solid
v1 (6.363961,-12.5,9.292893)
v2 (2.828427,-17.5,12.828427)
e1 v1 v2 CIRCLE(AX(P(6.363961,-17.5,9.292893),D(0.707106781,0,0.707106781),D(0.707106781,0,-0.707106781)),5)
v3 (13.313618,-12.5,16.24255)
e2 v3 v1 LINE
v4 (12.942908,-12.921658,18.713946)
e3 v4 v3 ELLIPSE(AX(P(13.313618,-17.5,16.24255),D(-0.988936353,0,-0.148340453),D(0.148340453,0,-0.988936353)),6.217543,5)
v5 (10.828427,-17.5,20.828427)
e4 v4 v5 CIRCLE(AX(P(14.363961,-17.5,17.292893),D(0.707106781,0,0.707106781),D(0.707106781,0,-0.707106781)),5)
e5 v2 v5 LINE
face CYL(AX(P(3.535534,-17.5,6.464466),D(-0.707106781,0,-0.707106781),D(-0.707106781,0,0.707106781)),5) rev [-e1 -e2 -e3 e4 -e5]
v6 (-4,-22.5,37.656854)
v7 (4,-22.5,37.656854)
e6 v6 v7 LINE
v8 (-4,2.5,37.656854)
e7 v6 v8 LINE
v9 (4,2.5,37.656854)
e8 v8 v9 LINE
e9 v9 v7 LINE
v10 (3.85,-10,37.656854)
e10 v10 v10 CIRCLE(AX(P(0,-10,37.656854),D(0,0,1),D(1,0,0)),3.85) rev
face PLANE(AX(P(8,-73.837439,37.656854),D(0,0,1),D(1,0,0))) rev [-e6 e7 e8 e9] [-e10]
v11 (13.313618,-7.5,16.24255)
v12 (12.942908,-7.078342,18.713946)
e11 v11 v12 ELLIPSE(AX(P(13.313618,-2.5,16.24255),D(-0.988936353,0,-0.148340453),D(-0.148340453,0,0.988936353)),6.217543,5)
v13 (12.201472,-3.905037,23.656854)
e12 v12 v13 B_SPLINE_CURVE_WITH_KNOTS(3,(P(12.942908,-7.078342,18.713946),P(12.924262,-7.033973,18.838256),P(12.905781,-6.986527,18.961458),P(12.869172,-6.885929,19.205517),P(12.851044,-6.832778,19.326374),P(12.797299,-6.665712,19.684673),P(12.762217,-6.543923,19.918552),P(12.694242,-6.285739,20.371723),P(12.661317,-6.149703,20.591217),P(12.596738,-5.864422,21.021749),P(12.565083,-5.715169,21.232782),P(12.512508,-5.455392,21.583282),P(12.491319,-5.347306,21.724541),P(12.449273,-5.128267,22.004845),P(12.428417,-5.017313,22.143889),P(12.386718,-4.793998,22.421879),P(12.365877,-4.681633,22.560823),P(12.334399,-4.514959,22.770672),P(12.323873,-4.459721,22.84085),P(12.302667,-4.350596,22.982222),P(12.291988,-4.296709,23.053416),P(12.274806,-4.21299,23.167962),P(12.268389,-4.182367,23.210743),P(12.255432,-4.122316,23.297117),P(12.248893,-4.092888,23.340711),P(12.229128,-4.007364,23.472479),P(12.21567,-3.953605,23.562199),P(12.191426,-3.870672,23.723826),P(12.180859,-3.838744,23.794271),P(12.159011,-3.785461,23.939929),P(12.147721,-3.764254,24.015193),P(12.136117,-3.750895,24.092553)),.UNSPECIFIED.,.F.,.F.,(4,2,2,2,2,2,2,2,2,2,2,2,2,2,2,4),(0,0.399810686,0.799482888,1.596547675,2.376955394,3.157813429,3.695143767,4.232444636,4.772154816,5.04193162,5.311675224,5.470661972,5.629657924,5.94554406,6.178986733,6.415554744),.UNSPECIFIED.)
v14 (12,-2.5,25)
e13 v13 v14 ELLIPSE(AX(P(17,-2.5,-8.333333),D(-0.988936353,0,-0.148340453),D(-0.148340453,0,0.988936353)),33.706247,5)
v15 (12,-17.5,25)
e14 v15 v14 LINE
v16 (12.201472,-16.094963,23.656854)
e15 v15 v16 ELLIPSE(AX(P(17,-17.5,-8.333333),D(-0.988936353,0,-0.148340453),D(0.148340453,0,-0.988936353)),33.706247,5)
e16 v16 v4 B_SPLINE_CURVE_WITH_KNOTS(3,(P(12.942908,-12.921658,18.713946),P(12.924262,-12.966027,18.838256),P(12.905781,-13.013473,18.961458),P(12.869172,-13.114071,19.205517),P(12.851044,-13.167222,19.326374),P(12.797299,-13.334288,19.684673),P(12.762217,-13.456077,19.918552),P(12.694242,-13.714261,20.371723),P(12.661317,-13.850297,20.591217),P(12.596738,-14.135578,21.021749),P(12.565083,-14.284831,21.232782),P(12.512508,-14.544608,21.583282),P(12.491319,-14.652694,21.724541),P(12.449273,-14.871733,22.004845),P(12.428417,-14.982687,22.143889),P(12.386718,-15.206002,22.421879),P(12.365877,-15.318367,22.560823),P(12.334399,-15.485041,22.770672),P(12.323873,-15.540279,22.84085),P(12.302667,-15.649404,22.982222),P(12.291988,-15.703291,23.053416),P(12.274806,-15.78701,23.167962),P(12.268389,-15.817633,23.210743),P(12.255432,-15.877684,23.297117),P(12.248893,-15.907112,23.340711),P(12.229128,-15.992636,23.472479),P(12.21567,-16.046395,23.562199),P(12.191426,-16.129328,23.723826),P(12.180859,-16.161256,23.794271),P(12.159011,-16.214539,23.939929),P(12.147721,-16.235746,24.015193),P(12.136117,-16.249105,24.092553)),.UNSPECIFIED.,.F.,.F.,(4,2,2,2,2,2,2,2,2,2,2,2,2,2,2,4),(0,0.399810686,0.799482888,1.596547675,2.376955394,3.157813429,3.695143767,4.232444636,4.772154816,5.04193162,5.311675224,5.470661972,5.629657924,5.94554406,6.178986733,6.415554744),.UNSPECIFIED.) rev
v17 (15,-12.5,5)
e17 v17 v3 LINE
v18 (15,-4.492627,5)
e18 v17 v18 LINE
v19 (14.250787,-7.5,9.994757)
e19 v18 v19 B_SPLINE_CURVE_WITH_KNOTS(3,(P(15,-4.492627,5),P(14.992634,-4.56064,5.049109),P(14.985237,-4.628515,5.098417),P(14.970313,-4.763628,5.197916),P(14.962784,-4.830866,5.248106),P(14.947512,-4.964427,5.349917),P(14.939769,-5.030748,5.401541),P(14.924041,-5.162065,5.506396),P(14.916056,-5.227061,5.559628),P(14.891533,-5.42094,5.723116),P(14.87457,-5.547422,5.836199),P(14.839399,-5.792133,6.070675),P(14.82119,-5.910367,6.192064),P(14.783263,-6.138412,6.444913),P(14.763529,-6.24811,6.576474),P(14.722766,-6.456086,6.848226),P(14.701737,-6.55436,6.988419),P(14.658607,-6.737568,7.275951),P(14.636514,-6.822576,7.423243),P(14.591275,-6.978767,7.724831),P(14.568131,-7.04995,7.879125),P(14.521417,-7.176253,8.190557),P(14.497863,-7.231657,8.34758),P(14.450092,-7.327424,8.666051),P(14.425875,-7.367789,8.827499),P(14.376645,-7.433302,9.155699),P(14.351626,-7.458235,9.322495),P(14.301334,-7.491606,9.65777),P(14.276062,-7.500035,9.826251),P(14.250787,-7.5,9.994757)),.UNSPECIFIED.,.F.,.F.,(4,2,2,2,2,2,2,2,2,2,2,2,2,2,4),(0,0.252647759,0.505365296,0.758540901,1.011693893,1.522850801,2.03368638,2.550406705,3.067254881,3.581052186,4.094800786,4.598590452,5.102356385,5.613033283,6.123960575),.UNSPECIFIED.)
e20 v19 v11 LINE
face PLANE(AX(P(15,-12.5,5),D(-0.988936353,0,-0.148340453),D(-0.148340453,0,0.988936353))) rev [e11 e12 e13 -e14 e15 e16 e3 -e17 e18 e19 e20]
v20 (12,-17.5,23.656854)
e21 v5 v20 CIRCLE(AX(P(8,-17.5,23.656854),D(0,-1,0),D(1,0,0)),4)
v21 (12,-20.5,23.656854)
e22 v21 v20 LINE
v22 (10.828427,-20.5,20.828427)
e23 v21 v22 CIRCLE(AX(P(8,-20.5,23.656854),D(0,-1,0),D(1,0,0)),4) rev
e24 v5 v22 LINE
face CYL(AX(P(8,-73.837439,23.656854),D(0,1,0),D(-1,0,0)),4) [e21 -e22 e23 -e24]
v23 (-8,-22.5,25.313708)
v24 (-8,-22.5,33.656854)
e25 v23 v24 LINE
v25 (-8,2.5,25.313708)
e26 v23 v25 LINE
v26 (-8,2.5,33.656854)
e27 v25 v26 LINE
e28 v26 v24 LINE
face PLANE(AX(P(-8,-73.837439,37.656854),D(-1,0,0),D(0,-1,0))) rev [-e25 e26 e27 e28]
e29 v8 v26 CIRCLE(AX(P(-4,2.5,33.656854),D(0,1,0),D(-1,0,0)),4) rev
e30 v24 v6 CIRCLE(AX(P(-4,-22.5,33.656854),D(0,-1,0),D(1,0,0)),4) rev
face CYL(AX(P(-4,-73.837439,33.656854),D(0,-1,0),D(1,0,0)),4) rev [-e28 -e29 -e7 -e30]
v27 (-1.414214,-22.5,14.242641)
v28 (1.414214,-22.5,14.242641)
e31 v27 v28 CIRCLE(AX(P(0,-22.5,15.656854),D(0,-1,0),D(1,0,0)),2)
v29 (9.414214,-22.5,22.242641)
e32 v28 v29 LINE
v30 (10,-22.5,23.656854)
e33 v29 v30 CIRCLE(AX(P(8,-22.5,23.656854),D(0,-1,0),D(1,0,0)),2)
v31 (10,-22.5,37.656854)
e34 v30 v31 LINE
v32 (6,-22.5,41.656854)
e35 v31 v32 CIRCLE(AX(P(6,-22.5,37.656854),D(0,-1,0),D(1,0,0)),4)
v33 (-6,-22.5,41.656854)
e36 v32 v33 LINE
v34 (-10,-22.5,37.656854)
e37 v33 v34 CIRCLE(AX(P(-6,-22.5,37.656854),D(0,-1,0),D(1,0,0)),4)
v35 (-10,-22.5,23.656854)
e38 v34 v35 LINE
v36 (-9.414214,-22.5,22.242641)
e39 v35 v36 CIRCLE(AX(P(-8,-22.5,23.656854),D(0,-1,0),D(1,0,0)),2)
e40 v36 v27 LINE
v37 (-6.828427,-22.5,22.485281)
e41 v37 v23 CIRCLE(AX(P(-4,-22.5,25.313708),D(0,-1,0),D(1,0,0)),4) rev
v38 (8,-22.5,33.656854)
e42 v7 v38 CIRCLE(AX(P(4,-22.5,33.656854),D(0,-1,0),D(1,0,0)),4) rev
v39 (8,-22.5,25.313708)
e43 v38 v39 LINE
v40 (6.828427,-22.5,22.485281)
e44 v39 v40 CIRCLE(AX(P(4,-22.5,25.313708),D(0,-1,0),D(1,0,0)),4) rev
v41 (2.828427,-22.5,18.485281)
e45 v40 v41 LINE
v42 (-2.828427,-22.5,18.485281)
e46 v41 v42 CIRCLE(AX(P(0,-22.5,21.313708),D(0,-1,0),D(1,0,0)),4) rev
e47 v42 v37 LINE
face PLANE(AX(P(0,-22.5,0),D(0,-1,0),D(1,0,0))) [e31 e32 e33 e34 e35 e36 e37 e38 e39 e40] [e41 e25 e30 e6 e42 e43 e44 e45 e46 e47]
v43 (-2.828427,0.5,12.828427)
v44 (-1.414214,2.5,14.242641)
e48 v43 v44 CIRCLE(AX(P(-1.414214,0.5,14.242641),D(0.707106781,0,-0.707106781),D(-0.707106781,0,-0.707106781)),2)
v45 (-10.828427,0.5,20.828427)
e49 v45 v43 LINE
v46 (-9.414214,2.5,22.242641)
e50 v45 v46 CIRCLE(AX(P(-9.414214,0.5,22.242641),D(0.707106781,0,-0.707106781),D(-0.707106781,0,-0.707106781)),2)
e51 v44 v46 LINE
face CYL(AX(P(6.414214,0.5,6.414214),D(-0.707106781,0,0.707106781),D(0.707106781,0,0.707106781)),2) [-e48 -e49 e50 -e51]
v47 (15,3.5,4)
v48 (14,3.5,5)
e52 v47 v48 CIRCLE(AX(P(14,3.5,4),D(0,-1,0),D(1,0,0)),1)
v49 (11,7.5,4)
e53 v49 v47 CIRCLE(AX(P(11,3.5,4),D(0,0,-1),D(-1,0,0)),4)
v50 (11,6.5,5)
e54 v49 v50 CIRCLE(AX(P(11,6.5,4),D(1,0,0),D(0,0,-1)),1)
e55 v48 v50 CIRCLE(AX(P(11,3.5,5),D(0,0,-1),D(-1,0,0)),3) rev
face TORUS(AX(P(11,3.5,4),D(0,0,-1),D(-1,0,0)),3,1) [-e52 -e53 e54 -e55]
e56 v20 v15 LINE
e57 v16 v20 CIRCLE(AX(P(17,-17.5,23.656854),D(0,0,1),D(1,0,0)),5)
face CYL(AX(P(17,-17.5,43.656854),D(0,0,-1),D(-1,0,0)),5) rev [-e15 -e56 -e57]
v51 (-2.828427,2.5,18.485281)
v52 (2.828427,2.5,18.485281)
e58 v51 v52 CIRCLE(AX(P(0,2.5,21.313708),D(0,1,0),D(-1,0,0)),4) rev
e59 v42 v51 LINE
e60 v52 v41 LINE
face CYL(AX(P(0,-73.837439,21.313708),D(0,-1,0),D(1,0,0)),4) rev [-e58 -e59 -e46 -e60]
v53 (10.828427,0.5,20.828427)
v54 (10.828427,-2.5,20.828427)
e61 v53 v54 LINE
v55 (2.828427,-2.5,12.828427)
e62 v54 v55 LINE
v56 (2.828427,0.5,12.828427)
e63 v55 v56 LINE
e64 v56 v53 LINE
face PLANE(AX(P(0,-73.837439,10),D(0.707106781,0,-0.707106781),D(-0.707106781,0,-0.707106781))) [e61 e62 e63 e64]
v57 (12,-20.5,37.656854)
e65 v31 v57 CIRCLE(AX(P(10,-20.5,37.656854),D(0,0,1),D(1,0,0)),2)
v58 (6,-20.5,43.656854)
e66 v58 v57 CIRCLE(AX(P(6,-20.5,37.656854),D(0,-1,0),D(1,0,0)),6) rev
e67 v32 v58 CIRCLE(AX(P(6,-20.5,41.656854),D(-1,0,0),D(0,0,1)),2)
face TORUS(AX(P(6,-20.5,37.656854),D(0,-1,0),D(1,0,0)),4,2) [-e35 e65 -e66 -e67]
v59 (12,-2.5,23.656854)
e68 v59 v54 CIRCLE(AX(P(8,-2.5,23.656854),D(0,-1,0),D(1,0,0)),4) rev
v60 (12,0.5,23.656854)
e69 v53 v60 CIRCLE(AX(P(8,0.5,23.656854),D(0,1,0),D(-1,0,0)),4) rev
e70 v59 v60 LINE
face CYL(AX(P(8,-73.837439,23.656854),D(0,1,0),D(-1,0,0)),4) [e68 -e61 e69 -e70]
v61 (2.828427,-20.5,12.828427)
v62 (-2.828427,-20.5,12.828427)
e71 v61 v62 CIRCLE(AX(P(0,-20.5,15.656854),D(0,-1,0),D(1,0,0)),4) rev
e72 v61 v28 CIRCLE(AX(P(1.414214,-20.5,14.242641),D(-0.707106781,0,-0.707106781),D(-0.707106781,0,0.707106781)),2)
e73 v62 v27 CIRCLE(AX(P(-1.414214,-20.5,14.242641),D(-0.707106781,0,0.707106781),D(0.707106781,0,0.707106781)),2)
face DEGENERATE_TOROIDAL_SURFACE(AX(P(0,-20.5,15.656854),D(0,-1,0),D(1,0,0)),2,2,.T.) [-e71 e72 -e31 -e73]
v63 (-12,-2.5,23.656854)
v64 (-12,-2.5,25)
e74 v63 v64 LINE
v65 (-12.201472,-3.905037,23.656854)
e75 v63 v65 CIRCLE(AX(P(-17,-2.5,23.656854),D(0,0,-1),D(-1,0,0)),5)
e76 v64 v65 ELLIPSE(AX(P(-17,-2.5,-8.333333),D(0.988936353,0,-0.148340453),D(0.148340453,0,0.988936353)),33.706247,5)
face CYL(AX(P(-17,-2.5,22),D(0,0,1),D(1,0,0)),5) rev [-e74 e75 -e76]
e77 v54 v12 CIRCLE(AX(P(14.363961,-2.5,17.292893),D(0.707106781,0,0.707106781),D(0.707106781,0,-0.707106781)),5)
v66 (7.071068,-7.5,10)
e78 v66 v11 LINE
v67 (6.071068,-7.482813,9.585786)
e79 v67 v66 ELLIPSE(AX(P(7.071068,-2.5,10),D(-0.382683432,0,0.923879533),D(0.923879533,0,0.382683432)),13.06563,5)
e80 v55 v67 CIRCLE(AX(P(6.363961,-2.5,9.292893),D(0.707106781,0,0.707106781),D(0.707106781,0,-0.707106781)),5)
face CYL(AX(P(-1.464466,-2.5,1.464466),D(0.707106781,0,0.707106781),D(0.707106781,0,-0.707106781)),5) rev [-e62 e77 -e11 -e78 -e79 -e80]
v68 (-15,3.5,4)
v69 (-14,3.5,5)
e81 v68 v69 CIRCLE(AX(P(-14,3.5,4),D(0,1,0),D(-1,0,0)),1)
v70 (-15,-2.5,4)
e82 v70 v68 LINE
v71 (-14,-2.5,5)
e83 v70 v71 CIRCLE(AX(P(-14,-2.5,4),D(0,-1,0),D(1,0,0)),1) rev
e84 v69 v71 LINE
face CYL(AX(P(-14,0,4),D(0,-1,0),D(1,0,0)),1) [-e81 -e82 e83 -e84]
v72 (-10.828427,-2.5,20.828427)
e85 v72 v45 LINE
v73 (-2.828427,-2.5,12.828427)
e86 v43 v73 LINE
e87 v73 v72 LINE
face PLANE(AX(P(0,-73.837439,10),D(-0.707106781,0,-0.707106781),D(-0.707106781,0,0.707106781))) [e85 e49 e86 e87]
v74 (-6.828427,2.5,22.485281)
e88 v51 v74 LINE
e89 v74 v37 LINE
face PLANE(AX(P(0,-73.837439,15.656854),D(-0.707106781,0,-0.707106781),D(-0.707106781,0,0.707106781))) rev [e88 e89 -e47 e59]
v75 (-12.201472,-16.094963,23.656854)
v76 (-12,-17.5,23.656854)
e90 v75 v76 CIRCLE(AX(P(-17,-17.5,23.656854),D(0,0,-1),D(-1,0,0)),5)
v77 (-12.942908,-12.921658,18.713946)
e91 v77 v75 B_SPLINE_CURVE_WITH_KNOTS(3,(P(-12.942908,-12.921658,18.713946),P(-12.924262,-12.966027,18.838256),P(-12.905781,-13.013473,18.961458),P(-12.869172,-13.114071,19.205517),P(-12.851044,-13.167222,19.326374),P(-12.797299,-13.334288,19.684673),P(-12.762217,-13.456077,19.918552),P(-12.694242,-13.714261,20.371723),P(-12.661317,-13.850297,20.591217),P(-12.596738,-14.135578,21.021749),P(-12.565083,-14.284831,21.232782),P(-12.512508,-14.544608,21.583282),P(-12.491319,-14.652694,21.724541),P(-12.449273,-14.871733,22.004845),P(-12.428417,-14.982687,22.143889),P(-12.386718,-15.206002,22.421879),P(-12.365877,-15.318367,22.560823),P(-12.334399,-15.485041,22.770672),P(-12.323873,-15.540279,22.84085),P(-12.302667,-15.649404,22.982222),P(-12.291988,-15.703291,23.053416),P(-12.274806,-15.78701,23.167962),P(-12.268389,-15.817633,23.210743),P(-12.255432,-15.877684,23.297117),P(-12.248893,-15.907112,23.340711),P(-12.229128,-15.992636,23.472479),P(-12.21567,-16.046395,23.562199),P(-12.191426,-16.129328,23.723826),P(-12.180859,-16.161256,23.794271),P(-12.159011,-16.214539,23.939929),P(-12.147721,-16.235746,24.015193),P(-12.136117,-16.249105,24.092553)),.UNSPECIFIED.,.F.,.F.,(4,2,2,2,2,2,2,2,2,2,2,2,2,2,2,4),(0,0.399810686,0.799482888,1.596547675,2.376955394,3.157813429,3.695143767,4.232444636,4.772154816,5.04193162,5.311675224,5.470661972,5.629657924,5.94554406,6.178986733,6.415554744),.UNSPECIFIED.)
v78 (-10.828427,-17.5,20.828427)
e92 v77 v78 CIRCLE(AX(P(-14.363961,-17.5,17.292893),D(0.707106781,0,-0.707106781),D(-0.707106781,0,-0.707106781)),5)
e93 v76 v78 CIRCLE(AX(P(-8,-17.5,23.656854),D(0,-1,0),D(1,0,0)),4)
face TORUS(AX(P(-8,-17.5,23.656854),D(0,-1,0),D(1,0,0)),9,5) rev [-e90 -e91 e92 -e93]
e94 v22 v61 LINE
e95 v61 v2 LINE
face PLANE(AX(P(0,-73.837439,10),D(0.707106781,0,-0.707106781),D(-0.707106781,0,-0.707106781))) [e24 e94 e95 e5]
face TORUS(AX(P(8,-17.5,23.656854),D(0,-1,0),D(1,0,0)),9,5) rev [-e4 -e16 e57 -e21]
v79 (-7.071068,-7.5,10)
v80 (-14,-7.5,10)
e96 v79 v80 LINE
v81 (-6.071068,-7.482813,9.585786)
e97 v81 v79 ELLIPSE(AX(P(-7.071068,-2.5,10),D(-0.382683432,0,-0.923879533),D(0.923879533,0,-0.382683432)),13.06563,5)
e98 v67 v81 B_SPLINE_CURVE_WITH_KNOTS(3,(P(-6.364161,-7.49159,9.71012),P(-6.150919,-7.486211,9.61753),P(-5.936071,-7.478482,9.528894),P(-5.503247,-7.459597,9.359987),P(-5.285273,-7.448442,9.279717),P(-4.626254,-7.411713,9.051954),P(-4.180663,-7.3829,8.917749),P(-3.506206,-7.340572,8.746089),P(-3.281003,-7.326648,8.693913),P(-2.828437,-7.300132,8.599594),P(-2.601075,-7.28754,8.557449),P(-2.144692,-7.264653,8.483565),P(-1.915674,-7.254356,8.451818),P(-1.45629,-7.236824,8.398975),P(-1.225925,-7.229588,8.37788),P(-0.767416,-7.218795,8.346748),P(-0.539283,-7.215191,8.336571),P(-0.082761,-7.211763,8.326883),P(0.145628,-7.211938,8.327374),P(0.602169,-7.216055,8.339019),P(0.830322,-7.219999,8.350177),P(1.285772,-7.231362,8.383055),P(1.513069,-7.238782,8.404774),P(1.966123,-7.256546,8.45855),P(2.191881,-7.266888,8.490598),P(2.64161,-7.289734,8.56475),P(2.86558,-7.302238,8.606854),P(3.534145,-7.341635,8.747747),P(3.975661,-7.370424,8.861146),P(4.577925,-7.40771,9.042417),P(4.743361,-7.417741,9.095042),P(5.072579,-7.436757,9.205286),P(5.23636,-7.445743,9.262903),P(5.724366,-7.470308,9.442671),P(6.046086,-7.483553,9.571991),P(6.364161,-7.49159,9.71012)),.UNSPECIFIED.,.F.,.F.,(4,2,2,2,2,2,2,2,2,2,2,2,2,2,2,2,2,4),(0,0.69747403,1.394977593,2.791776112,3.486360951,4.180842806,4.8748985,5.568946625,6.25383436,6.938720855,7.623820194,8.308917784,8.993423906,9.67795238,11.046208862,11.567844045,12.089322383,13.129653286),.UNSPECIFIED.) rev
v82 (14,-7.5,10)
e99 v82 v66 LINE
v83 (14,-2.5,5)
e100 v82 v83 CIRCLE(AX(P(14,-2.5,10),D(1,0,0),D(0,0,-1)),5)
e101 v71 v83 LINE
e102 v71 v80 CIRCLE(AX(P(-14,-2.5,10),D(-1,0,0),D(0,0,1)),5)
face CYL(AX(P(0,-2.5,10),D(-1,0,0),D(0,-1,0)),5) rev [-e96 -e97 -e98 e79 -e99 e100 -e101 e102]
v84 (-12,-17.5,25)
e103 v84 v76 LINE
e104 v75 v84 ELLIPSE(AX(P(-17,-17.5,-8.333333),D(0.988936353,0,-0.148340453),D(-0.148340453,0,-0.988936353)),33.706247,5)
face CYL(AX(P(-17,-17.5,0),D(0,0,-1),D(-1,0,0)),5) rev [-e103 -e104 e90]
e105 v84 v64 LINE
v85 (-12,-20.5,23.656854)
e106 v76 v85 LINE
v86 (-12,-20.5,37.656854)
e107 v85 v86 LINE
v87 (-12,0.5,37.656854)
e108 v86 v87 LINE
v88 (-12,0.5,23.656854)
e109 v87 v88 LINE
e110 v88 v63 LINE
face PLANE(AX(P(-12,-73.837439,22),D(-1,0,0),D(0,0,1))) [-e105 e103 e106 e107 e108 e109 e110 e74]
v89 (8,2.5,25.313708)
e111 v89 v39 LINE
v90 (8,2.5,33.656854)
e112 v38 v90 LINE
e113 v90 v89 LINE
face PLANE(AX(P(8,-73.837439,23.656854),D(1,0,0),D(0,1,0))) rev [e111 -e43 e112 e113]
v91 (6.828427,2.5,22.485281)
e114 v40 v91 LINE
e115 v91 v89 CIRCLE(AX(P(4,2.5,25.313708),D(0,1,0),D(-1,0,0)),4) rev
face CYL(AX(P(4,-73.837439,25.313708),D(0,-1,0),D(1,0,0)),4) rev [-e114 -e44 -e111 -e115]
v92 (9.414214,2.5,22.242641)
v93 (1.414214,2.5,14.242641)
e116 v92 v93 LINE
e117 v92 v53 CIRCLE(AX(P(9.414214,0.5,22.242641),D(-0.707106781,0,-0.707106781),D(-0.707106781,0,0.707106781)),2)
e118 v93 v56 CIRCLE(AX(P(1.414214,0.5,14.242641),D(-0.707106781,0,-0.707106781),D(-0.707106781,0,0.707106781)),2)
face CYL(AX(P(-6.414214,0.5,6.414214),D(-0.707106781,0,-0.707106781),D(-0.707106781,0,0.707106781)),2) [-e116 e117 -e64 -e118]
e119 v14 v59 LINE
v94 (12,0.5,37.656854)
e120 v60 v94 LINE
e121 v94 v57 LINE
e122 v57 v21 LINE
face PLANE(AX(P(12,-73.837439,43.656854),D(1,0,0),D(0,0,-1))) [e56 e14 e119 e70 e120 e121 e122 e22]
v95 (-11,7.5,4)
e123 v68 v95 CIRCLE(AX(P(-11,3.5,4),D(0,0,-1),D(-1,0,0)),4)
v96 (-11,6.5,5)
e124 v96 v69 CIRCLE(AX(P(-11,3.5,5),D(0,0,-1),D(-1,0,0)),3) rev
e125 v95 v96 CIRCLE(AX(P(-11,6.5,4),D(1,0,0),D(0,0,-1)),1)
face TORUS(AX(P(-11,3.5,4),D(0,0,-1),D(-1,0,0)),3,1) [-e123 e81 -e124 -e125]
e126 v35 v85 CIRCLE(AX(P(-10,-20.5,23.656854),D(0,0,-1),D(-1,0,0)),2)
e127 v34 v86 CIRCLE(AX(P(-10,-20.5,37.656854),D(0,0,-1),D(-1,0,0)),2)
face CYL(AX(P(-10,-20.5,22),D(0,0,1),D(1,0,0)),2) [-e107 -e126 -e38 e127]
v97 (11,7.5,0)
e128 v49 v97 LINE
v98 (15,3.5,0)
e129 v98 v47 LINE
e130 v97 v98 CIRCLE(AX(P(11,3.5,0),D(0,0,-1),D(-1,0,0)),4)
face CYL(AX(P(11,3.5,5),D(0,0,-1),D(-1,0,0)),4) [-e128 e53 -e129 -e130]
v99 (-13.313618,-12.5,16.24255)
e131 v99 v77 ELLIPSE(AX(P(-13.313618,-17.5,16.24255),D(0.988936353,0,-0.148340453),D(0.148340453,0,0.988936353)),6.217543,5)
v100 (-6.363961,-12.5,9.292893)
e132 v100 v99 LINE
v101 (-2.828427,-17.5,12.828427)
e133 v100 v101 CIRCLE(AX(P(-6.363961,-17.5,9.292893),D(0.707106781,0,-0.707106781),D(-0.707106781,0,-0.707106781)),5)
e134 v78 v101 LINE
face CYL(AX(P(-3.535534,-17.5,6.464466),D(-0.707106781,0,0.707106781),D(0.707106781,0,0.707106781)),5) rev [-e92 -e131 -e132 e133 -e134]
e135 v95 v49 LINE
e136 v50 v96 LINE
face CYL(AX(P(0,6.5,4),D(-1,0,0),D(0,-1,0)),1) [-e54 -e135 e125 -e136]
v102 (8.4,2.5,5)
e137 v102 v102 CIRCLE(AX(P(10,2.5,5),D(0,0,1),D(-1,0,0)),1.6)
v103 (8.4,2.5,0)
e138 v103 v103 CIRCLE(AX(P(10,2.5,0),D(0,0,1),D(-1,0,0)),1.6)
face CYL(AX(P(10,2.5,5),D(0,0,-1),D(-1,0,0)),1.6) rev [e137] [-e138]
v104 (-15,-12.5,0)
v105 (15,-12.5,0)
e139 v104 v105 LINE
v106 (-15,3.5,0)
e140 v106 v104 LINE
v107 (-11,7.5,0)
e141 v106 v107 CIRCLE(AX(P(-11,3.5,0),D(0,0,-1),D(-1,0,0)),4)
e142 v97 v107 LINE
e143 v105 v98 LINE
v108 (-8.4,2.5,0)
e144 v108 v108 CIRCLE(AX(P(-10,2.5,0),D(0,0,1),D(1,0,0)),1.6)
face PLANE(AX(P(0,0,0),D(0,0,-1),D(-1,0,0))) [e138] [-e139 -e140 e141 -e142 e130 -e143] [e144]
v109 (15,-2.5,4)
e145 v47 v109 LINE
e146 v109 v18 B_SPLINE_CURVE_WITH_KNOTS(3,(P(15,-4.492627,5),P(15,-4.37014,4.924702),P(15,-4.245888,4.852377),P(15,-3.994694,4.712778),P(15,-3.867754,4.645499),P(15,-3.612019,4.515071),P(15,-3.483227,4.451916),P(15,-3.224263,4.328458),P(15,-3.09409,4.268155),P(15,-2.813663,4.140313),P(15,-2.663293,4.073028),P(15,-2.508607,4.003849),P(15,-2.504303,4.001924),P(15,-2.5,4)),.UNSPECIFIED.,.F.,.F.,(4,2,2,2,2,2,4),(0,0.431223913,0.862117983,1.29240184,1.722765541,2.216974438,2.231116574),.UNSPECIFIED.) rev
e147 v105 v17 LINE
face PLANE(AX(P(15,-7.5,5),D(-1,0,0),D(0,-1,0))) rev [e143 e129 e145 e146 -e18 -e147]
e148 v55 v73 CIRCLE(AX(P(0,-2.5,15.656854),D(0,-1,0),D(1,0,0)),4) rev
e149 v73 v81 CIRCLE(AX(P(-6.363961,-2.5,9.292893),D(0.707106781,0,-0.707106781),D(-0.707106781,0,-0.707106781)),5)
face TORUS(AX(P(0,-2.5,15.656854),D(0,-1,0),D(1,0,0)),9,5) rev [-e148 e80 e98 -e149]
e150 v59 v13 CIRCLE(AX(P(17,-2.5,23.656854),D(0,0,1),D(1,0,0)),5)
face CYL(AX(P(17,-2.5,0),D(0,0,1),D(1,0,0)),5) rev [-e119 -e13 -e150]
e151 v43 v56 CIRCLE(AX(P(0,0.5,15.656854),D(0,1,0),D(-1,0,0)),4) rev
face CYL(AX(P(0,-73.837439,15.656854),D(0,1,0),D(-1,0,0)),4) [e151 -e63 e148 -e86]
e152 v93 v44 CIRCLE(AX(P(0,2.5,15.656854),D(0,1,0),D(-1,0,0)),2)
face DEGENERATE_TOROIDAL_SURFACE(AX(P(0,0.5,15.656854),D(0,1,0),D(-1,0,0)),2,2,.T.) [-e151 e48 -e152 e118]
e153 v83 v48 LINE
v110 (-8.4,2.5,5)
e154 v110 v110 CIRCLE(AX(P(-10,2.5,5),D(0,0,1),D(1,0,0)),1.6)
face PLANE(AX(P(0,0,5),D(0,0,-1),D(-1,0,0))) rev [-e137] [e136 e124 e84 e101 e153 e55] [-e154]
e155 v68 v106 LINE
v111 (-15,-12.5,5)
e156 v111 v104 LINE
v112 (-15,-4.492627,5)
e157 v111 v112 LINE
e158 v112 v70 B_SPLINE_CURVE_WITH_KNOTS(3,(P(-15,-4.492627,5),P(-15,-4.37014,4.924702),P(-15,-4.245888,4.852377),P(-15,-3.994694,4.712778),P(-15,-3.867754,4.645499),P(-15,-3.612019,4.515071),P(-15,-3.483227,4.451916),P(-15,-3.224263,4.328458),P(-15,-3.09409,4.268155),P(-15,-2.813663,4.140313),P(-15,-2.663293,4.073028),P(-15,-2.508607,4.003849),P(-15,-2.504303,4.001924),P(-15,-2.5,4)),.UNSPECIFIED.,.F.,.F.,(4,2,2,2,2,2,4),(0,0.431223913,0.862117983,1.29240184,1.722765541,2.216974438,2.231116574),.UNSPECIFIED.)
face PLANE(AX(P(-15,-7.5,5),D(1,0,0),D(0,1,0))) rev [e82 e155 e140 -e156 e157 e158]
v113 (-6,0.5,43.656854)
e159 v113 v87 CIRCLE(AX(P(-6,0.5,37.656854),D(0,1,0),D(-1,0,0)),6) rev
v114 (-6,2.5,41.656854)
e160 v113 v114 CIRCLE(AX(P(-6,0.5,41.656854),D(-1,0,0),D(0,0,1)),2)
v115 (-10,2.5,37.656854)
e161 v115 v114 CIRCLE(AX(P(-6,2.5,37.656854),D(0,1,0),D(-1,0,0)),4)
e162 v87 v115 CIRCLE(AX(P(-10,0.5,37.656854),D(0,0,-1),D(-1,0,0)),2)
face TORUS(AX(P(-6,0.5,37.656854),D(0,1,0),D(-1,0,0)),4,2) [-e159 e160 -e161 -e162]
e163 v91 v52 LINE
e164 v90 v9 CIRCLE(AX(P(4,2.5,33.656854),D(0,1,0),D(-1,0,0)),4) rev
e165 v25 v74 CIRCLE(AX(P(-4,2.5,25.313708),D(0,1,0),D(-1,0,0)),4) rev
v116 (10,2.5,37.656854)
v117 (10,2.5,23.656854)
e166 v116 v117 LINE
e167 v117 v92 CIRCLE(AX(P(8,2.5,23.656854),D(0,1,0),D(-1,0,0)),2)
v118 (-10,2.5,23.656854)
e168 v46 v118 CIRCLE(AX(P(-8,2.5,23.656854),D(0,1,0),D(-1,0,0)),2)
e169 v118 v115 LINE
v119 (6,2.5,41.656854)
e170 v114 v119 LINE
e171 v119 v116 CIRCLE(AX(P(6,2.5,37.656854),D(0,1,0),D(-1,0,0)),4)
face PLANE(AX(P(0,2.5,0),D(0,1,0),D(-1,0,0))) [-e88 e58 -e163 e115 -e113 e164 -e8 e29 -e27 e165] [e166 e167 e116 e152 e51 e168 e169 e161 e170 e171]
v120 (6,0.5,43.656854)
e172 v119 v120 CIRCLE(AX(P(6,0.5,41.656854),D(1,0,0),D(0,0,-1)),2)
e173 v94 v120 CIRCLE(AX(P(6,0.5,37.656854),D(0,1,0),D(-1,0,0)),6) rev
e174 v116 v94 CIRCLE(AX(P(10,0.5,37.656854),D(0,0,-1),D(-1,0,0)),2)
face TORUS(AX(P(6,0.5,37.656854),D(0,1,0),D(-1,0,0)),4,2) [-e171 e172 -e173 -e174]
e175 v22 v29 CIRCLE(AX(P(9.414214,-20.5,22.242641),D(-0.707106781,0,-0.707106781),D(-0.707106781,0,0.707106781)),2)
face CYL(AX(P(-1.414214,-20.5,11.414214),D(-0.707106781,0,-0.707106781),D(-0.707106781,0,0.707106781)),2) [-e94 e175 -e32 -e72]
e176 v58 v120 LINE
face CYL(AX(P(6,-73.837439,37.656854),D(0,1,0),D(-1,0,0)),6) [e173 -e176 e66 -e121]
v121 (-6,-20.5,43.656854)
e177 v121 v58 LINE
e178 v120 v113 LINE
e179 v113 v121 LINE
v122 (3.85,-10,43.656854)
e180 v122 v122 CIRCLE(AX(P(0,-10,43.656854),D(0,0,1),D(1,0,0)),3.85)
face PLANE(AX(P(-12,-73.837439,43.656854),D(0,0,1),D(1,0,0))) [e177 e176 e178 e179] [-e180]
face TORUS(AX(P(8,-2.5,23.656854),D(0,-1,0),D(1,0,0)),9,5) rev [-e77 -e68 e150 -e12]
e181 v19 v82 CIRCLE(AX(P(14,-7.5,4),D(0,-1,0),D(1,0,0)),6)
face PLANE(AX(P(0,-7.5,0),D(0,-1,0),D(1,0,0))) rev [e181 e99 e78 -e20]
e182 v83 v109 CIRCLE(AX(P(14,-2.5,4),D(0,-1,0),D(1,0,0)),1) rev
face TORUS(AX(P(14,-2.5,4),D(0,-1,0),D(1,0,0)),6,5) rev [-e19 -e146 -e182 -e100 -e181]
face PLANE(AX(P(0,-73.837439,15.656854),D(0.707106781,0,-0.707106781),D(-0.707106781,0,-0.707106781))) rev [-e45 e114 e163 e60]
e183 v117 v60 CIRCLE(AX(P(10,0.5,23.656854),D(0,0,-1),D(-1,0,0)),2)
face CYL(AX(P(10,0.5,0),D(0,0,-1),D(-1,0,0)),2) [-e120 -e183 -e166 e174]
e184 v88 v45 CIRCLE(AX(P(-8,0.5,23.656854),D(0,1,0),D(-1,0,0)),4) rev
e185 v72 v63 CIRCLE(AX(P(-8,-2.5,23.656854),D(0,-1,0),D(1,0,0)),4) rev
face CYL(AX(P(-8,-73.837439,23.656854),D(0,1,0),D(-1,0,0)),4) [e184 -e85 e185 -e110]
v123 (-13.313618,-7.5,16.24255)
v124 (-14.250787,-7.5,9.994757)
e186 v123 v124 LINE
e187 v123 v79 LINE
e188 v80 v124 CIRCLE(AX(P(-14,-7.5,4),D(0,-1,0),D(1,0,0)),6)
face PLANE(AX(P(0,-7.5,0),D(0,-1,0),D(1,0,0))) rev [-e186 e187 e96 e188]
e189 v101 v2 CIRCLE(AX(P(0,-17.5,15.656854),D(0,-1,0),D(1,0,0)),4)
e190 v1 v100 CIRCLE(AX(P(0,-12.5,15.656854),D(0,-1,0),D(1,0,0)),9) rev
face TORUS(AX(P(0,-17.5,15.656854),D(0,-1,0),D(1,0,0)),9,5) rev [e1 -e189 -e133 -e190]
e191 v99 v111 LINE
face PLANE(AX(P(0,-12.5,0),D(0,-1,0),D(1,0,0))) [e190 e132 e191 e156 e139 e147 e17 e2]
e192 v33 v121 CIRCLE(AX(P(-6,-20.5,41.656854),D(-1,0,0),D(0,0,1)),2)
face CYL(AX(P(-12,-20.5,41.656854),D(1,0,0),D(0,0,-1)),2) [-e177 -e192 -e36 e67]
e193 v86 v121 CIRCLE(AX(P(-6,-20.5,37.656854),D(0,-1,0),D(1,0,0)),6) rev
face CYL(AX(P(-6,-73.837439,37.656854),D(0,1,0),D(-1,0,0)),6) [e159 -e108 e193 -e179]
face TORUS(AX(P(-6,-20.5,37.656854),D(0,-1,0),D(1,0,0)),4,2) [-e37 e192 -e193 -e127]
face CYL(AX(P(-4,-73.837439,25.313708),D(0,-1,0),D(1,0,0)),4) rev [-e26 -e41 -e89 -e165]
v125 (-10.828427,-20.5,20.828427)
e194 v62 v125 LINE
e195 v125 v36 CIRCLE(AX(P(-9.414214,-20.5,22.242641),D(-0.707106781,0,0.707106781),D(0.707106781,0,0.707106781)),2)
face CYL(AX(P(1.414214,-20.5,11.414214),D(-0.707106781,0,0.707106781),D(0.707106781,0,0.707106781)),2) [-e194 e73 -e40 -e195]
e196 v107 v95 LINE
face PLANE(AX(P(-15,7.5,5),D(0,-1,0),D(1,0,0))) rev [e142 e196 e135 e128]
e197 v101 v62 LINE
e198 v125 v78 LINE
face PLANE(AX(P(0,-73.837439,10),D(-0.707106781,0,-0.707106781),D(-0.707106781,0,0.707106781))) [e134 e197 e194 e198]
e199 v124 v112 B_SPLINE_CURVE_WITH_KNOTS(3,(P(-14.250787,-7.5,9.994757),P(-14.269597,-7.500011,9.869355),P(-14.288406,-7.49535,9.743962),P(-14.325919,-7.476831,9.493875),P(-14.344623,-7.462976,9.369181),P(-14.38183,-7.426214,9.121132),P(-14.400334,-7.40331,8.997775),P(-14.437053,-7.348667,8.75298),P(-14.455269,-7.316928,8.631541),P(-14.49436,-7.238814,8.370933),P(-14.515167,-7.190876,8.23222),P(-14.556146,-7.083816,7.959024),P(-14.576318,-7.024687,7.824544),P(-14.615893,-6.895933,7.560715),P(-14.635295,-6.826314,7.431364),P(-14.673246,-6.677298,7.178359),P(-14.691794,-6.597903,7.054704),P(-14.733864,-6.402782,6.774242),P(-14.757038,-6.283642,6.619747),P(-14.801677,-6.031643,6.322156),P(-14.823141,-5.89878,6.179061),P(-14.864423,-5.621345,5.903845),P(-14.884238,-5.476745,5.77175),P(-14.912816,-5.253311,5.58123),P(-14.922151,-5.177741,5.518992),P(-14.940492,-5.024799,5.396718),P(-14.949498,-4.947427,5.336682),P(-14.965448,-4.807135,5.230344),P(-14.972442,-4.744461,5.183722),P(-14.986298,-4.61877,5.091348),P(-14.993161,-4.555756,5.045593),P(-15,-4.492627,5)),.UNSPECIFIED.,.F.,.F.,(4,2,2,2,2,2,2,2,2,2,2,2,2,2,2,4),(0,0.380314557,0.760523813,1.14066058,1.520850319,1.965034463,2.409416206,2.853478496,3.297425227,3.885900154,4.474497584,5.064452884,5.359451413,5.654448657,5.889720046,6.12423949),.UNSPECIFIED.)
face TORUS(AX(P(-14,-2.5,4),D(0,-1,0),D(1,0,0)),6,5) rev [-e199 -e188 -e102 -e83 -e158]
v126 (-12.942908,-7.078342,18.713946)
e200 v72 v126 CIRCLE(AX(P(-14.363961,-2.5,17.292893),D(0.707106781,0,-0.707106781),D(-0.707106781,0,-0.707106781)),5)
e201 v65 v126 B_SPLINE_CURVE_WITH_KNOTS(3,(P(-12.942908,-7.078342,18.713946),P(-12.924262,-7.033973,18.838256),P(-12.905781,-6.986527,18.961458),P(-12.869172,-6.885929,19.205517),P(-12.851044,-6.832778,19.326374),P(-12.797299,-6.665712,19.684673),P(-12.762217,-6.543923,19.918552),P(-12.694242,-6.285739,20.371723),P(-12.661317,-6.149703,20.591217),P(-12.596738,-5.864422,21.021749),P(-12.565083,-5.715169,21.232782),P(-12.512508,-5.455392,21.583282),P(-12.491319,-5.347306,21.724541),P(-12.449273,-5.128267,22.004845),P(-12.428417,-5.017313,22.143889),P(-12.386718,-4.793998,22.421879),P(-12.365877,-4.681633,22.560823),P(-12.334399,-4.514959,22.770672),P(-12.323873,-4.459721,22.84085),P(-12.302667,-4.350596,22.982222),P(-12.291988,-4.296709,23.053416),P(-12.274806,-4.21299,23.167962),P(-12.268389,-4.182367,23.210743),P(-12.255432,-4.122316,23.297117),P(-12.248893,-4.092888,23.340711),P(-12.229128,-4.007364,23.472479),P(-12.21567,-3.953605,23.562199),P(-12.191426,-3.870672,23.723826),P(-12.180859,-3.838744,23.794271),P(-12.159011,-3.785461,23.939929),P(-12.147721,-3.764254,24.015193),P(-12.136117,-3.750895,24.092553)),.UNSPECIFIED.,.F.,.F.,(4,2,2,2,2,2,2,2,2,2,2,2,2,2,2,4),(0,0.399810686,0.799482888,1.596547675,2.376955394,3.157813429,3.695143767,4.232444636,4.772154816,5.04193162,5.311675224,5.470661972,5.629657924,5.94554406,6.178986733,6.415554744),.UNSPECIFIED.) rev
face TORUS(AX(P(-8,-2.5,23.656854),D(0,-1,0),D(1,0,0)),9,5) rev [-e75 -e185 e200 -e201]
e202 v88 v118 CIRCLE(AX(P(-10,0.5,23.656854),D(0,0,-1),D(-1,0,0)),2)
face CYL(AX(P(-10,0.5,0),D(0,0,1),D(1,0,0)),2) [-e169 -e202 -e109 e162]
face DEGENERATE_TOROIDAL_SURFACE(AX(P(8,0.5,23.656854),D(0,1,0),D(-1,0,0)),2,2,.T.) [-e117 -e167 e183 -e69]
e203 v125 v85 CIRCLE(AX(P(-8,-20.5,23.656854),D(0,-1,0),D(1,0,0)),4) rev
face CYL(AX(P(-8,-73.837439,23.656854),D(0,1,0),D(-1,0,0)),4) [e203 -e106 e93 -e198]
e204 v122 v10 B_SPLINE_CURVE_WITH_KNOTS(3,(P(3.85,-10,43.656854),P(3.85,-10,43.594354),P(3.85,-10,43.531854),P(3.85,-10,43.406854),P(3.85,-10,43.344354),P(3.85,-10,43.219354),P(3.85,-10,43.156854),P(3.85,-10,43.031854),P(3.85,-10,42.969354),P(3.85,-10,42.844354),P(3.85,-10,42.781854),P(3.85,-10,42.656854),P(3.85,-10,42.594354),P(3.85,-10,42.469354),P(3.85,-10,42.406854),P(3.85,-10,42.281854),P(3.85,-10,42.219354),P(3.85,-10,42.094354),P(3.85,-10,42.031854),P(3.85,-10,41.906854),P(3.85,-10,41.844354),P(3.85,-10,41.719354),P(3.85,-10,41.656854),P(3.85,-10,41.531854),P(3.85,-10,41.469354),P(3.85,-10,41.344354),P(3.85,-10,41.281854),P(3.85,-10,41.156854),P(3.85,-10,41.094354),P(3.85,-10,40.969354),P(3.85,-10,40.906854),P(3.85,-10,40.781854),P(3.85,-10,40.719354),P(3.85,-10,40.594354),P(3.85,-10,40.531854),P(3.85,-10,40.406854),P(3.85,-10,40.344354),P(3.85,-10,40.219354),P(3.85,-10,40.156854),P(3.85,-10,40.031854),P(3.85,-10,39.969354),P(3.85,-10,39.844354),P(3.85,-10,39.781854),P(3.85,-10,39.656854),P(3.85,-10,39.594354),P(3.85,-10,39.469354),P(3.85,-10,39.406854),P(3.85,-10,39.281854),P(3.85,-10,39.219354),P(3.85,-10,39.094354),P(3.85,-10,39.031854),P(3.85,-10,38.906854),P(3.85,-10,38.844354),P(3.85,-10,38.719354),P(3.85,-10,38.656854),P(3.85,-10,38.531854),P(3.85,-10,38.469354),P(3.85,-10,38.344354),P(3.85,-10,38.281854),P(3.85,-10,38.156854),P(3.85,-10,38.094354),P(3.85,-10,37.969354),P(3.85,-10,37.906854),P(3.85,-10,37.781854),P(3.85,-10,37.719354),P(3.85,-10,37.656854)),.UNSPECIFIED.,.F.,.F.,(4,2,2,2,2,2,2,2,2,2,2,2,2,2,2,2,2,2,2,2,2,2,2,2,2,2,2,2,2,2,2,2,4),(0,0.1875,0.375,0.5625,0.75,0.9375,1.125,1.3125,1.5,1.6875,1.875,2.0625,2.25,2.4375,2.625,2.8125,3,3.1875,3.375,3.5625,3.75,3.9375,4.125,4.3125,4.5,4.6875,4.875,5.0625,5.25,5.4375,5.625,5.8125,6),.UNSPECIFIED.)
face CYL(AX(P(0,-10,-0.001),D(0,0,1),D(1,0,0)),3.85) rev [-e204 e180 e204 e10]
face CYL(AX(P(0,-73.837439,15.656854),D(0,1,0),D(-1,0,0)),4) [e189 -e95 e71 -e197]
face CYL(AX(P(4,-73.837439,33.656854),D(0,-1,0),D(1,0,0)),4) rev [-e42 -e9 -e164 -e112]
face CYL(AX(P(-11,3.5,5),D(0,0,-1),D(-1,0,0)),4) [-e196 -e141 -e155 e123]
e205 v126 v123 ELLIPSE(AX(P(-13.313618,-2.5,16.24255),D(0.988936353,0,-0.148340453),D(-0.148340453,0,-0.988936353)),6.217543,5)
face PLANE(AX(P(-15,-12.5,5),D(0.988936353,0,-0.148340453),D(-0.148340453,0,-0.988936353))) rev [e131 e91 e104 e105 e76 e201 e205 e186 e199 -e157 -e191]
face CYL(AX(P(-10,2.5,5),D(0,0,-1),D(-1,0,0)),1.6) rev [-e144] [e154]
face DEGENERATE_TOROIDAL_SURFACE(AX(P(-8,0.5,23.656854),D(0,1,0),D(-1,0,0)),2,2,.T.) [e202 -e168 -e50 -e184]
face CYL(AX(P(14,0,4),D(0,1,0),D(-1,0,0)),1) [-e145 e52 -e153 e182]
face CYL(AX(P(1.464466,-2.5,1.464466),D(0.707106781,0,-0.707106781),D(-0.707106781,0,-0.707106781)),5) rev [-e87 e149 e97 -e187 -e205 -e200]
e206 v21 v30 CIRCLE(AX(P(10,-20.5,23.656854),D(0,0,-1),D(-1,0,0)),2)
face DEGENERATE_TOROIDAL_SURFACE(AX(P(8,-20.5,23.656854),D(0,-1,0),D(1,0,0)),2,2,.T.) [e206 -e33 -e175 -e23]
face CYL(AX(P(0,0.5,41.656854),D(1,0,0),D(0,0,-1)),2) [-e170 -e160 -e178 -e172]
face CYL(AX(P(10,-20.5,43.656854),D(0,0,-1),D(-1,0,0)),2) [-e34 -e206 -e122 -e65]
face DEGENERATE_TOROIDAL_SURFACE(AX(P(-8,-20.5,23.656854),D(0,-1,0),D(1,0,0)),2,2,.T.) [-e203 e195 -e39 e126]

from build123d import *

# Parameters (mm, degrees)
SKETCH_1_W               = 30
SKETCH_1_H               = 15
SKETCH_1_R               = 1.6
EXTRUDE_1_DEPTH          = 5
EXTRUDE_2_DEPTH          = 5
EXTRUDE_START            = -15
EXTRUDE_3_DEPTH          = 25
CUT_EXTRUDE_1_REACH      = 53.353
SKETCH_5_R               = 3.85
CUT_EXTRUDE_3_DEPTH      = 53.496865839
CUT_EXTRUDE_3_DEPTH_BACK = 53.496865839
FILLET_1_R               = 4
FILLET_2_R               = 6
FILLET_3_R               = 2
FILLET_4_R               = 4
FILLET_9_R               = 1
FILLET_10_R              = 5


with BuildPart() as part:
    # 草图1 → 凸台-拉伸1 (new body)
    with BuildSketch(Plane.XY):
        Rectangle(SKETCH_1_W, SKETCH_1_H)
        with Locations((-10, 2.5)):
            Circle(SKETCH_1_R, mode=Mode.SUBTRACT)
        with Locations(Location((10, 2.5, 0), (0, 0, 180))):
            Circle(SKETCH_1_R, mode=Mode.SUBTRACT)
    extrude(amount=EXTRUDE_1_DEPTH)

    # 草图3 → 凸台-拉伸2 (add)
    with BuildSketch(Plane.XZ.offset(7.5)):
        Polygon((-15, 0), (15, 0), (15, 5), (12, 25), (-12, 25), (-15, 5), align=None)
    extrude(amount=EXTRUDE_2_DEPTH)

    # 草图4 → 凸台-拉伸3 (add)
    with BuildSketch(Plane(origin=(0, -7.5, 0), x_dir=(1, 0, 0), z_dir=(0, 1, 0)).offset(EXTRUDE_START)):
        Polygon((0, -10), (12, -22), (12, -43.656854249), (-12, -43.656854249), (-12, -22), align=None)
        Polygon((8, -37.656854249), (-8, -37.656854249), (-8, -23.656854249), (0, -15.656854249), (8, -23.656854249), align=None, mode=Mode.SUBTRACT)
    extrude(amount=EXTRUDE_3_DEPTH)

    # 草图5 → 切除-拉伸1 (cut, up to next)
    with BuildSketch(Plane.XY.offset(43.656854249), mode=Mode.PRIVATE) as cut_extrude_1_sk1:
        with Locations((0, -10)):
            Circle(SKETCH_5_R)
    cut_extrude_1_tool1 = extrude(cut_extrude_1_sk1.sketch, amount=-CUT_EXTRUDE_1_REACH, mode=Mode.PRIVATE) & part.part
    add(cut_extrude_1_tool1.solids().sort_by_distance((0, -10, 43.656854))[0], mode=Mode.SUBTRACT)

    # 草图7 → 切除-拉伸3 (cut, two sides: drawn at the far end of the back side and taken through both)
    with BuildSketch(Plane(origin=(0, 2.5, 0), x_dir=(1, 0, 0), z_dir=(0, 1, 0)).offset(-CUT_EXTRUDE_3_DEPTH_BACK)):
        Polygon((-8, -23.656854249), (-8, -25), (8, -25), (8, -23.656854249), (0, -15.656854249), align=None)
    extrude(amount=CUT_EXTRUDE_3_DEPTH + CUT_EXTRUDE_3_DEPTH_BACK, mode=Mode.SUBTRACT)

    # 圆角1
    fillet_1_edges = [part.edges().sort_by_distance(p)[0] for p in [
        (-12, -2.5, 22),
        (0, -2.5, 10),
        (0, -10, 15.656854249),
        (8, -10, 23.656854249),
        (-12, -17.5, 22),
        (0, -17.5, 10),
        (12, -17.5, 22),
        (12, -2.5, 22),
        (8, -10, 37.656854249),
        (-8, -10, 37.656854249),
        (-8, -10, 23.656854249),
    ]]
    fillet(fillet_1_edges, radius=FILLET_1_R)

    # 圆角2
    fillet_2_edges = [part.edges().sort_by_distance(p)[0] for p in [
        (12, -10, 43.656854249),
        (-12, -10, 43.656854249),
    ]]
    fillet(fillet_2_edges, radius=FILLET_2_R)

    # 圆角3
    fillet_3_edges = [part.edges().sort_by_distance(p)[0] for p in [
        (-6.828427125, -22.5, 16.828427125),
        (-12, -22.5, 30.656854249),
        (-12, 2.5, 30.656854249),
        (6.828427125, -22.5, 16.828427125),
        (0, -22.5, 11.656854249),
        (11.69551813, -22.5, 22.12612052),
        (-11.69551813, -22.5, 22.12612052),
        (-6.828427125, 2.5, 16.828427125),
        (6.828427125, 2.5, 16.828427125),
        (0, 2.5, 11.656854249),
        (11.69551813, 2.5, 22.12612052),
        (-11.69551813, 2.5, 22.12612052),
        (0, -22.5, 43.656854249),
        (0, 2.5, 43.656854249),
        (12, 2.5, 30.656854249),
        (-10.242640687, 2.5, 41.899494937),
        (10.242640687, 2.5, 41.899494937),
        (12, -22.5, 30.656854249),
        (-10.242640687, -22.5, 41.899494937),
        (10.242640687, -22.5, 41.899494937),
    ]]
    fillet(fillet_3_edges, radius=FILLET_3_R)

    # 圆角4
    fillet_4_edges = [part.edges().sort_by_distance(p)[0] for p in [
        (-15, 7.5, 2.5),
        (15, 7.5, 2.5),
    ]]
    fillet(fillet_4_edges, radius=FILLET_4_R)

    # 圆角9
    fillet_9_edges = [part.edges().sort_by_distance(p)[0] for p in [
        (0, 7.5, 5),
        (-15, -2, 5),
        (-13.828427125, 6.328427125, 5),
        (13.828427125, 6.328427125, 5),
        (15, -2, 5),
    ]]
    fillet(fillet_9_edges, radius=FILLET_9_R)

    # 圆角10
    # the kernel refuses this fillet: 5 mm, written as the material it adds along each edge
    with BuildSketch(Plane(origin=(-12, -7.5, 37.5), x_dir=(-1, 0, 0), z_dir=(0, 0, -1))) as fillet_10_piece_1_section:
        with BuildLine():
            CenterArc((FILLET_10_R, FILLET_10_R), FILLET_10_R, 180, 90)
            Line((0, FILLET_10_R), (0, 0))
            Line((0, 0), (FILLET_10_R, 0))
        make_face()
    fillet_10_piece_1 = extrude(amount=13.843145751, mode=Mode.PRIVATE)
    fillet_10_piece_1 = split(fillet_10_piece_1, bisect_by=Plane(origin=(-12.131106439, -5.365485475, 24.125957074), z_dir=(0.9889363528682976, 0, -0.14834045293024392)), keep=Keep.TOP, mode=Mode.PRIVATE)
    add(fillet_10_piece_1)
    with BuildSketch(Plane(origin=(12, -7.5, 23.656854249), x_dir=(1, 0, 0), z_dir=(0, 0, 1))) as fillet_10_piece_2_section:
        with BuildLine():
            CenterArc((FILLET_10_R, FILLET_10_R), FILLET_10_R, 180, 90)
            Line((0, FILLET_10_R), (0, 0))
            Line((0, 0), (FILLET_10_R, 0))
        make_face()
    fillet_10_piece_2 = extrude(amount=13.843145751, mode=Mode.PRIVATE)
    fillet_10_piece_2 = split(fillet_10_piece_2, bisect_by=Plane(origin=(12.131106439, -5.365485475, 24.125957074), z_dir=(-0.9889363528682976, 0, -0.14834045293024423)), keep=Keep.TOP, mode=Mode.PRIVATE)
    add(fillet_10_piece_2)
    with BuildSketch(Plane(origin=(2.828427125, -7.5, 12.828427125), x_dir=(0.7071067811865546, 0, -0.7071067811865405), z_dir=(0.7071067811865405, 0, 0.7071067811865547))) as fillet_10_piece_3_section:
        with BuildLine():
            CenterArc((FILLET_10_R, FILLET_10_R), FILLET_10_R, 180, 90)
            Line((0, FILLET_10_R), (0, 0))
            Line((0, 0), (FILLET_10_R, 0))
        make_face()
    fillet_10_piece_3 = extrude(amount=11.313708499, mode=Mode.PRIVATE)
    fillet_10_piece_3 = split(fillet_10_piece_3, bisect_by=Plane(origin=(13.218453032, -6.381417365, 16.876979785), z_dir=(-0.9889363528682976, 0, -0.14834045293024423)), keep=Keep.TOP, mode=Mode.PRIVATE)
    add(fillet_10_piece_3)
    with BuildSketch(Plane(origin=(0, -7.5, 15.656854249), x_dir=(0.7071067811865549, 0, -0.7071067811865404), z_dir=(0.7071067811865404, 0, 0.7071067811865549))) as fillet_10_piece_4:
        with BuildLine():
            CenterArc((4 + FILLET_10_R, FILLET_10_R), FILLET_10_R, 180, 90)
            Line((4, FILLET_10_R), (4, 0))
            Line((4, 0), (4 + FILLET_10_R, 0))
        make_face()
    revolve(axis=Axis((0, -7.5, 15.656854249), (0, 1, 0)), revolution_arc=90)
    with BuildSketch(Plane(origin=(-12, -12.5, 37.5), x_dir=(-1, 0, 0), z_dir=(0, 0, -1))) as fillet_10_piece_5_section:
        with BuildLine():
            CenterArc((FILLET_10_R, -FILLET_10_R), FILLET_10_R, 90, 90)
            Line((0, -FILLET_10_R), (0, 0))
            Line((0, 0), (FILLET_10_R, 0))
        make_face()
    fillet_10_piece_5 = extrude(amount=13.843145751, mode=Mode.PRIVATE)
    fillet_10_piece_5 = split(fillet_10_piece_5, bisect_by=Plane(origin=(-12.131106439, -14.634514525, 24.125957074), z_dir=(0.9889363528682976, 0, -0.14834045293024392)), keep=Keep.TOP, mode=Mode.PRIVATE)
    add(fillet_10_piece_5)
    with BuildSketch(Plane(origin=(12, -12.5, 23.656854249), x_dir=(1, 0, 0), z_dir=(0, 0, 1))) as fillet_10_piece_6_section:
        with BuildLine():
            CenterArc((FILLET_10_R, -FILLET_10_R), FILLET_10_R, 90, 90)
            Line((0, -FILLET_10_R), (0, 0))
            Line((0, 0), (FILLET_10_R, 0))
        make_face()
    fillet_10_piece_6 = extrude(amount=13.843145751, mode=Mode.PRIVATE)
    fillet_10_piece_6 = split(fillet_10_piece_6, bisect_by=Plane(origin=(12.131106439, -14.634514525, 24.125957074), z_dir=(-0.9889363528682976, 0, -0.14834045293024423)), keep=Keep.TOP, mode=Mode.PRIVATE)
    add(fillet_10_piece_6)
    with BuildSketch(Plane(origin=(2.828427125, -12.5, 12.828427125), x_dir=(0.7071067811865546, 0, -0.7071067811865404), z_dir=(0.7071067811865405, 0, 0.7071067811865547))) as fillet_10_piece_7_section:
        with BuildLine():
            CenterArc((FILLET_10_R, -FILLET_10_R), FILLET_10_R, 90, 90)
            Line((0, -FILLET_10_R), (0, 0))
            Line((0, 0), (FILLET_10_R, 0))
        make_face()
    fillet_10_piece_7 = extrude(amount=11.313708499, mode=Mode.PRIVATE)
    fillet_10_piece_7 = split(fillet_10_piece_7, bisect_by=Plane(origin=(13.218453032, -13.618582635, 16.876979785), z_dir=(-0.9889363528682976, 0, -0.14834045293024423)), keep=Keep.TOP, mode=Mode.PRIVATE)
    add(fillet_10_piece_7)
    with BuildSketch(Plane(origin=(0, -12.5, 15.656854249), x_dir=(0.7071067811865549, 0, -0.7071067811865404), z_dir=(0.7071067811865404, 0, 0.7071067811865549))) as fillet_10_piece_8:
        with BuildLine():
            CenterArc((4 + FILLET_10_R, -FILLET_10_R), FILLET_10_R, 90, 90)
            Line((4, -FILLET_10_R), (4, 0))
            Line((4, 0), (4 + FILLET_10_R, 0))
        make_face()
    revolve(axis=Axis((0, -12.5, 15.656854249), (0, 1, 0)), revolution_arc=90)
    with BuildSketch(Plane(origin=(-14, -7.5, 4), x_dir=(0, 0, 1), z_dir=(1, 0, 0))) as fillet_10_piece_9_section:
        with BuildLine():
            CenterArc((1 + FILLET_10_R, -FILLET_10_R), FILLET_10_R, 90, 90)
            Line((1 + FILLET_10_R, 0), (1, 0))
            Line((1, 0), (1, -FILLET_10_R))
        make_face()
    fillet_10_piece_9 = revolve(axis=Axis((-14, -7.5, 4), (0, -1, 0)), revolution_arc=359.64, mode=Mode.PRIVATE)
    fillet_10_piece_9 = split(fillet_10_piece_9, bisect_by=Plane(origin=(-15, -5.48235467, 4.767475024), z_dir=(1, 0, 0)), keep=Keep.TOP, mode=Mode.PRIVATE)
    fillet_10_piece_9 = split(fillet_10_piece_9, bisect_by=Plane(origin=(-14.767475023, -5.48235467, 0), z_dir=(0, 0, 1)), keep=Keep.TOP, mode=Mode.PRIVATE)
    fillet_10_piece_9 = split(fillet_10_piece_9, bisect_by=Plane(origin=(-15.028994557, -5.48235467, 4.806702954), z_dir=(0.9889363528682976, 0, -0.14834045293024392)), keep=Keep.TOP, mode=Mode.PRIVATE)
    add(fillet_10_piece_9)
    with BuildSketch(Plane(origin=(14, -7.5, 4), x_dir=(0, 0, 1), z_dir=(-1, 0, 0))) as fillet_10_piece_10_section:
        with BuildLine():
            CenterArc((1 + FILLET_10_R, FILLET_10_R), FILLET_10_R, 180, 90)
            Line((1, FILLET_10_R), (1, 0))
            Line((1, 0), (1 + FILLET_10_R, 0))
        make_face()
    fillet_10_piece_10 = revolve(axis=Axis((14, -7.5, 4), (0, 1, 0)), revolution_arc=359.64, mode=Mode.PRIVATE)
    fillet_10_piece_10 = split(fillet_10_piece_10, bisect_by=Plane(origin=(14.413021761, -6.394485082, 0), z_dir=(0, 0, 1)), keep=Keep.TOP, mode=Mode.PRIVATE)
    fillet_10_piece_10 = split(fillet_10_piece_10, bisect_by=Plane(origin=(15, -6.394485082, 5.985808303), z_dir=(-1, 0, 0)), keep=Keep.TOP, mode=Mode.PRIVATE)
    fillet_10_piece_10 = split(fillet_10_piece_10, bisect_by=Plane(origin=(14.842466253, -6.394485082, 6.050224977), z_dir=(-0.9889363528682976, 0, -0.14834045293024423)), keep=Keep.TOP, mode=Mode.PRIVATE)
    add(fillet_10_piece_10)
    with BuildSketch(Plane(origin=(-10.828427125, -7.5, 20.828427125), x_dir=(-0.7071067811865444, 0, -0.7071067811865507), z_dir=(0.7071067811865508, 0, -0.7071067811865444))) as fillet_10_piece_11_section:
        with BuildLine():
            CenterArc((FILLET_10_R, FILLET_10_R), FILLET_10_R, 180, 90)
            Line((0, FILLET_10_R), (0, 0))
            Line((0, 0), (FILLET_10_R, 0))
        make_face()
    fillet_10_piece_11 = extrude(amount=11.313708499, mode=Mode.PRIVATE)
    fillet_10_piece_11 = split(fillet_10_piece_11, bisect_by=Plane(origin=(-13.218453032, -6.381417365, 16.876979785), z_dir=(0.9889363528682976, 0, -0.14834045293024392)), keep=Keep.TOP, mode=Mode.PRIVATE)
    add(fillet_10_piece_11)
    with BuildSketch(Plane(origin=(-10.828427125, -12.5, 20.828427125), x_dir=(-0.7071067811865442, 0, -0.7071067811865508), z_dir=(0.7071067811865508, 0, -0.7071067811865444))) as fillet_10_piece_12_section:
        with BuildLine():
            CenterArc((FILLET_10_R, -FILLET_10_R), FILLET_10_R, 90, 90)
            Line((0, -FILLET_10_R), (0, 0))
            Line((0, 0), (FILLET_10_R, 0))
        make_face()
    fillet_10_piece_12 = extrude(amount=11.313708499, mode=Mode.PRIVATE)
    fillet_10_piece_12 = split(fillet_10_piece_12, bisect_by=Plane(origin=(-13.218453032, -13.618582635, 16.876979785), z_dir=(0.9889363528682976, 0, -0.14834045293024392)), keep=Keep.TOP, mode=Mode.PRIVATE)
    add(fillet_10_piece_12)
    with BuildSketch(Plane(origin=(-14, -7.5, 5), x_dir=(0, 0, 1), z_dir=(1, 0, 0))) as fillet_10_piece_13:
        with BuildLine():
            CenterArc((FILLET_10_R, -FILLET_10_R), FILLET_10_R, 90, 90)
            Line((0, -FILLET_10_R), (0, 0))
            Line((0, 0), (FILLET_10_R, 0))
        make_face()
    extrude(amount=28)
    with BuildSketch(Plane(origin=(-8, -12.5, 23.656854249), x_dir=(-1, 0, 0), z_dir=(0, 0, 1))) as fillet_10_piece_14_section:
        with BuildLine():
            CenterArc((4 + FILLET_10_R, FILLET_10_R), FILLET_10_R, 180, 90)
            Line((4, FILLET_10_R), (4, 0))
            Line((4, 0), (4 + FILLET_10_R, 0))
        make_face()
    fillet_10_piece_14 = revolve(axis=Axis((-8, -12.5, 23.656854249), (0, -1, 0)), revolution_arc=45, mode=Mode.PRIVATE)
    fillet_10_piece_14 = split(fillet_10_piece_14, bisect_by=Plane(origin=(-12.615752224, -13.436487527, 20.894985171), z_dir=(0.9889363528682976, 0, -0.14834045293024392)), keep=Keep.TOP, mode=Mode.PRIVATE)
    add(fillet_10_piece_14)
    with BuildSketch(Plane(origin=(-8, -7.5, 23.656854249), x_dir=(-1, 0, 0), z_dir=(0, 0, 1))) as fillet_10_piece_15_section:
        with BuildLine():
            CenterArc((4 + FILLET_10_R, -FILLET_10_R), FILLET_10_R, 90, 90)
            Line((4, -FILLET_10_R), (4, 0))
            Line((4, 0), (4 + FILLET_10_R, 0))
        make_face()
    fillet_10_piece_15 = revolve(axis=Axis((-8, -7.5, 23.656854249), (0, -1, 0)), revolution_arc=45, mode=Mode.PRIVATE)
    fillet_10_piece_15 = split(fillet_10_piece_15, bisect_by=Plane(origin=(-12.615752224, -6.563512473, 20.894985171), z_dir=(0.9889363528682976, 0, -0.14834045293024392)), keep=Keep.TOP, mode=Mode.PRIVATE)
    add(fillet_10_piece_15)
    with BuildSketch(Plane(origin=(8, -12.5, 23.656854249), x_dir=(1, 0, 0), z_dir=(0, 0, 1))) as fillet_10_piece_16_section:
        with BuildLine():
            CenterArc((4 + FILLET_10_R, -FILLET_10_R), FILLET_10_R, 90, 90)
            Line((4, -FILLET_10_R), (4, 0))
            Line((4, 0), (4 + FILLET_10_R, 0))
        make_face()
    fillet_10_piece_16 = revolve(axis=Axis((8, -12.5, 23.656854249), (0, 1, 0)), revolution_arc=45, mode=Mode.PRIVATE)
    fillet_10_piece_16 = split(fillet_10_piece_16, bisect_by=Plane(origin=(12.615752224, -13.436487526, 20.894985172), z_dir=(-0.9889363528682976, 0, -0.14834045293024423)), keep=Keep.TOP, mode=Mode.PRIVATE)
    add(fillet_10_piece_16)
    with BuildSketch(Plane(origin=(8, -7.5, 23.656854249), x_dir=(1, 0, 0), z_dir=(0, 0, 1))) as fillet_10_piece_17_section:
        with BuildLine():
            CenterArc((4 + FILLET_10_R, FILLET_10_R), FILLET_10_R, 180, 90)
            Line((4, FILLET_10_R), (4, 0))
            Line((4, 0), (4 + FILLET_10_R, 0))
        make_face()
    fillet_10_piece_17 = revolve(axis=Axis((8, -7.5, 23.656854249), (0, 1, 0)), revolution_arc=45, mode=Mode.PRIVATE)
    fillet_10_piece_17 = split(fillet_10_piece_17, bisect_by=Plane(origin=(12.615752224, -6.563512474, 20.894985171), z_dir=(-0.9889363528682976, 0, -0.14834045293024423)), keep=Keep.TOP, mode=Mode.PRIVATE)
    add(fillet_10_piece_17)


solid = part.part
